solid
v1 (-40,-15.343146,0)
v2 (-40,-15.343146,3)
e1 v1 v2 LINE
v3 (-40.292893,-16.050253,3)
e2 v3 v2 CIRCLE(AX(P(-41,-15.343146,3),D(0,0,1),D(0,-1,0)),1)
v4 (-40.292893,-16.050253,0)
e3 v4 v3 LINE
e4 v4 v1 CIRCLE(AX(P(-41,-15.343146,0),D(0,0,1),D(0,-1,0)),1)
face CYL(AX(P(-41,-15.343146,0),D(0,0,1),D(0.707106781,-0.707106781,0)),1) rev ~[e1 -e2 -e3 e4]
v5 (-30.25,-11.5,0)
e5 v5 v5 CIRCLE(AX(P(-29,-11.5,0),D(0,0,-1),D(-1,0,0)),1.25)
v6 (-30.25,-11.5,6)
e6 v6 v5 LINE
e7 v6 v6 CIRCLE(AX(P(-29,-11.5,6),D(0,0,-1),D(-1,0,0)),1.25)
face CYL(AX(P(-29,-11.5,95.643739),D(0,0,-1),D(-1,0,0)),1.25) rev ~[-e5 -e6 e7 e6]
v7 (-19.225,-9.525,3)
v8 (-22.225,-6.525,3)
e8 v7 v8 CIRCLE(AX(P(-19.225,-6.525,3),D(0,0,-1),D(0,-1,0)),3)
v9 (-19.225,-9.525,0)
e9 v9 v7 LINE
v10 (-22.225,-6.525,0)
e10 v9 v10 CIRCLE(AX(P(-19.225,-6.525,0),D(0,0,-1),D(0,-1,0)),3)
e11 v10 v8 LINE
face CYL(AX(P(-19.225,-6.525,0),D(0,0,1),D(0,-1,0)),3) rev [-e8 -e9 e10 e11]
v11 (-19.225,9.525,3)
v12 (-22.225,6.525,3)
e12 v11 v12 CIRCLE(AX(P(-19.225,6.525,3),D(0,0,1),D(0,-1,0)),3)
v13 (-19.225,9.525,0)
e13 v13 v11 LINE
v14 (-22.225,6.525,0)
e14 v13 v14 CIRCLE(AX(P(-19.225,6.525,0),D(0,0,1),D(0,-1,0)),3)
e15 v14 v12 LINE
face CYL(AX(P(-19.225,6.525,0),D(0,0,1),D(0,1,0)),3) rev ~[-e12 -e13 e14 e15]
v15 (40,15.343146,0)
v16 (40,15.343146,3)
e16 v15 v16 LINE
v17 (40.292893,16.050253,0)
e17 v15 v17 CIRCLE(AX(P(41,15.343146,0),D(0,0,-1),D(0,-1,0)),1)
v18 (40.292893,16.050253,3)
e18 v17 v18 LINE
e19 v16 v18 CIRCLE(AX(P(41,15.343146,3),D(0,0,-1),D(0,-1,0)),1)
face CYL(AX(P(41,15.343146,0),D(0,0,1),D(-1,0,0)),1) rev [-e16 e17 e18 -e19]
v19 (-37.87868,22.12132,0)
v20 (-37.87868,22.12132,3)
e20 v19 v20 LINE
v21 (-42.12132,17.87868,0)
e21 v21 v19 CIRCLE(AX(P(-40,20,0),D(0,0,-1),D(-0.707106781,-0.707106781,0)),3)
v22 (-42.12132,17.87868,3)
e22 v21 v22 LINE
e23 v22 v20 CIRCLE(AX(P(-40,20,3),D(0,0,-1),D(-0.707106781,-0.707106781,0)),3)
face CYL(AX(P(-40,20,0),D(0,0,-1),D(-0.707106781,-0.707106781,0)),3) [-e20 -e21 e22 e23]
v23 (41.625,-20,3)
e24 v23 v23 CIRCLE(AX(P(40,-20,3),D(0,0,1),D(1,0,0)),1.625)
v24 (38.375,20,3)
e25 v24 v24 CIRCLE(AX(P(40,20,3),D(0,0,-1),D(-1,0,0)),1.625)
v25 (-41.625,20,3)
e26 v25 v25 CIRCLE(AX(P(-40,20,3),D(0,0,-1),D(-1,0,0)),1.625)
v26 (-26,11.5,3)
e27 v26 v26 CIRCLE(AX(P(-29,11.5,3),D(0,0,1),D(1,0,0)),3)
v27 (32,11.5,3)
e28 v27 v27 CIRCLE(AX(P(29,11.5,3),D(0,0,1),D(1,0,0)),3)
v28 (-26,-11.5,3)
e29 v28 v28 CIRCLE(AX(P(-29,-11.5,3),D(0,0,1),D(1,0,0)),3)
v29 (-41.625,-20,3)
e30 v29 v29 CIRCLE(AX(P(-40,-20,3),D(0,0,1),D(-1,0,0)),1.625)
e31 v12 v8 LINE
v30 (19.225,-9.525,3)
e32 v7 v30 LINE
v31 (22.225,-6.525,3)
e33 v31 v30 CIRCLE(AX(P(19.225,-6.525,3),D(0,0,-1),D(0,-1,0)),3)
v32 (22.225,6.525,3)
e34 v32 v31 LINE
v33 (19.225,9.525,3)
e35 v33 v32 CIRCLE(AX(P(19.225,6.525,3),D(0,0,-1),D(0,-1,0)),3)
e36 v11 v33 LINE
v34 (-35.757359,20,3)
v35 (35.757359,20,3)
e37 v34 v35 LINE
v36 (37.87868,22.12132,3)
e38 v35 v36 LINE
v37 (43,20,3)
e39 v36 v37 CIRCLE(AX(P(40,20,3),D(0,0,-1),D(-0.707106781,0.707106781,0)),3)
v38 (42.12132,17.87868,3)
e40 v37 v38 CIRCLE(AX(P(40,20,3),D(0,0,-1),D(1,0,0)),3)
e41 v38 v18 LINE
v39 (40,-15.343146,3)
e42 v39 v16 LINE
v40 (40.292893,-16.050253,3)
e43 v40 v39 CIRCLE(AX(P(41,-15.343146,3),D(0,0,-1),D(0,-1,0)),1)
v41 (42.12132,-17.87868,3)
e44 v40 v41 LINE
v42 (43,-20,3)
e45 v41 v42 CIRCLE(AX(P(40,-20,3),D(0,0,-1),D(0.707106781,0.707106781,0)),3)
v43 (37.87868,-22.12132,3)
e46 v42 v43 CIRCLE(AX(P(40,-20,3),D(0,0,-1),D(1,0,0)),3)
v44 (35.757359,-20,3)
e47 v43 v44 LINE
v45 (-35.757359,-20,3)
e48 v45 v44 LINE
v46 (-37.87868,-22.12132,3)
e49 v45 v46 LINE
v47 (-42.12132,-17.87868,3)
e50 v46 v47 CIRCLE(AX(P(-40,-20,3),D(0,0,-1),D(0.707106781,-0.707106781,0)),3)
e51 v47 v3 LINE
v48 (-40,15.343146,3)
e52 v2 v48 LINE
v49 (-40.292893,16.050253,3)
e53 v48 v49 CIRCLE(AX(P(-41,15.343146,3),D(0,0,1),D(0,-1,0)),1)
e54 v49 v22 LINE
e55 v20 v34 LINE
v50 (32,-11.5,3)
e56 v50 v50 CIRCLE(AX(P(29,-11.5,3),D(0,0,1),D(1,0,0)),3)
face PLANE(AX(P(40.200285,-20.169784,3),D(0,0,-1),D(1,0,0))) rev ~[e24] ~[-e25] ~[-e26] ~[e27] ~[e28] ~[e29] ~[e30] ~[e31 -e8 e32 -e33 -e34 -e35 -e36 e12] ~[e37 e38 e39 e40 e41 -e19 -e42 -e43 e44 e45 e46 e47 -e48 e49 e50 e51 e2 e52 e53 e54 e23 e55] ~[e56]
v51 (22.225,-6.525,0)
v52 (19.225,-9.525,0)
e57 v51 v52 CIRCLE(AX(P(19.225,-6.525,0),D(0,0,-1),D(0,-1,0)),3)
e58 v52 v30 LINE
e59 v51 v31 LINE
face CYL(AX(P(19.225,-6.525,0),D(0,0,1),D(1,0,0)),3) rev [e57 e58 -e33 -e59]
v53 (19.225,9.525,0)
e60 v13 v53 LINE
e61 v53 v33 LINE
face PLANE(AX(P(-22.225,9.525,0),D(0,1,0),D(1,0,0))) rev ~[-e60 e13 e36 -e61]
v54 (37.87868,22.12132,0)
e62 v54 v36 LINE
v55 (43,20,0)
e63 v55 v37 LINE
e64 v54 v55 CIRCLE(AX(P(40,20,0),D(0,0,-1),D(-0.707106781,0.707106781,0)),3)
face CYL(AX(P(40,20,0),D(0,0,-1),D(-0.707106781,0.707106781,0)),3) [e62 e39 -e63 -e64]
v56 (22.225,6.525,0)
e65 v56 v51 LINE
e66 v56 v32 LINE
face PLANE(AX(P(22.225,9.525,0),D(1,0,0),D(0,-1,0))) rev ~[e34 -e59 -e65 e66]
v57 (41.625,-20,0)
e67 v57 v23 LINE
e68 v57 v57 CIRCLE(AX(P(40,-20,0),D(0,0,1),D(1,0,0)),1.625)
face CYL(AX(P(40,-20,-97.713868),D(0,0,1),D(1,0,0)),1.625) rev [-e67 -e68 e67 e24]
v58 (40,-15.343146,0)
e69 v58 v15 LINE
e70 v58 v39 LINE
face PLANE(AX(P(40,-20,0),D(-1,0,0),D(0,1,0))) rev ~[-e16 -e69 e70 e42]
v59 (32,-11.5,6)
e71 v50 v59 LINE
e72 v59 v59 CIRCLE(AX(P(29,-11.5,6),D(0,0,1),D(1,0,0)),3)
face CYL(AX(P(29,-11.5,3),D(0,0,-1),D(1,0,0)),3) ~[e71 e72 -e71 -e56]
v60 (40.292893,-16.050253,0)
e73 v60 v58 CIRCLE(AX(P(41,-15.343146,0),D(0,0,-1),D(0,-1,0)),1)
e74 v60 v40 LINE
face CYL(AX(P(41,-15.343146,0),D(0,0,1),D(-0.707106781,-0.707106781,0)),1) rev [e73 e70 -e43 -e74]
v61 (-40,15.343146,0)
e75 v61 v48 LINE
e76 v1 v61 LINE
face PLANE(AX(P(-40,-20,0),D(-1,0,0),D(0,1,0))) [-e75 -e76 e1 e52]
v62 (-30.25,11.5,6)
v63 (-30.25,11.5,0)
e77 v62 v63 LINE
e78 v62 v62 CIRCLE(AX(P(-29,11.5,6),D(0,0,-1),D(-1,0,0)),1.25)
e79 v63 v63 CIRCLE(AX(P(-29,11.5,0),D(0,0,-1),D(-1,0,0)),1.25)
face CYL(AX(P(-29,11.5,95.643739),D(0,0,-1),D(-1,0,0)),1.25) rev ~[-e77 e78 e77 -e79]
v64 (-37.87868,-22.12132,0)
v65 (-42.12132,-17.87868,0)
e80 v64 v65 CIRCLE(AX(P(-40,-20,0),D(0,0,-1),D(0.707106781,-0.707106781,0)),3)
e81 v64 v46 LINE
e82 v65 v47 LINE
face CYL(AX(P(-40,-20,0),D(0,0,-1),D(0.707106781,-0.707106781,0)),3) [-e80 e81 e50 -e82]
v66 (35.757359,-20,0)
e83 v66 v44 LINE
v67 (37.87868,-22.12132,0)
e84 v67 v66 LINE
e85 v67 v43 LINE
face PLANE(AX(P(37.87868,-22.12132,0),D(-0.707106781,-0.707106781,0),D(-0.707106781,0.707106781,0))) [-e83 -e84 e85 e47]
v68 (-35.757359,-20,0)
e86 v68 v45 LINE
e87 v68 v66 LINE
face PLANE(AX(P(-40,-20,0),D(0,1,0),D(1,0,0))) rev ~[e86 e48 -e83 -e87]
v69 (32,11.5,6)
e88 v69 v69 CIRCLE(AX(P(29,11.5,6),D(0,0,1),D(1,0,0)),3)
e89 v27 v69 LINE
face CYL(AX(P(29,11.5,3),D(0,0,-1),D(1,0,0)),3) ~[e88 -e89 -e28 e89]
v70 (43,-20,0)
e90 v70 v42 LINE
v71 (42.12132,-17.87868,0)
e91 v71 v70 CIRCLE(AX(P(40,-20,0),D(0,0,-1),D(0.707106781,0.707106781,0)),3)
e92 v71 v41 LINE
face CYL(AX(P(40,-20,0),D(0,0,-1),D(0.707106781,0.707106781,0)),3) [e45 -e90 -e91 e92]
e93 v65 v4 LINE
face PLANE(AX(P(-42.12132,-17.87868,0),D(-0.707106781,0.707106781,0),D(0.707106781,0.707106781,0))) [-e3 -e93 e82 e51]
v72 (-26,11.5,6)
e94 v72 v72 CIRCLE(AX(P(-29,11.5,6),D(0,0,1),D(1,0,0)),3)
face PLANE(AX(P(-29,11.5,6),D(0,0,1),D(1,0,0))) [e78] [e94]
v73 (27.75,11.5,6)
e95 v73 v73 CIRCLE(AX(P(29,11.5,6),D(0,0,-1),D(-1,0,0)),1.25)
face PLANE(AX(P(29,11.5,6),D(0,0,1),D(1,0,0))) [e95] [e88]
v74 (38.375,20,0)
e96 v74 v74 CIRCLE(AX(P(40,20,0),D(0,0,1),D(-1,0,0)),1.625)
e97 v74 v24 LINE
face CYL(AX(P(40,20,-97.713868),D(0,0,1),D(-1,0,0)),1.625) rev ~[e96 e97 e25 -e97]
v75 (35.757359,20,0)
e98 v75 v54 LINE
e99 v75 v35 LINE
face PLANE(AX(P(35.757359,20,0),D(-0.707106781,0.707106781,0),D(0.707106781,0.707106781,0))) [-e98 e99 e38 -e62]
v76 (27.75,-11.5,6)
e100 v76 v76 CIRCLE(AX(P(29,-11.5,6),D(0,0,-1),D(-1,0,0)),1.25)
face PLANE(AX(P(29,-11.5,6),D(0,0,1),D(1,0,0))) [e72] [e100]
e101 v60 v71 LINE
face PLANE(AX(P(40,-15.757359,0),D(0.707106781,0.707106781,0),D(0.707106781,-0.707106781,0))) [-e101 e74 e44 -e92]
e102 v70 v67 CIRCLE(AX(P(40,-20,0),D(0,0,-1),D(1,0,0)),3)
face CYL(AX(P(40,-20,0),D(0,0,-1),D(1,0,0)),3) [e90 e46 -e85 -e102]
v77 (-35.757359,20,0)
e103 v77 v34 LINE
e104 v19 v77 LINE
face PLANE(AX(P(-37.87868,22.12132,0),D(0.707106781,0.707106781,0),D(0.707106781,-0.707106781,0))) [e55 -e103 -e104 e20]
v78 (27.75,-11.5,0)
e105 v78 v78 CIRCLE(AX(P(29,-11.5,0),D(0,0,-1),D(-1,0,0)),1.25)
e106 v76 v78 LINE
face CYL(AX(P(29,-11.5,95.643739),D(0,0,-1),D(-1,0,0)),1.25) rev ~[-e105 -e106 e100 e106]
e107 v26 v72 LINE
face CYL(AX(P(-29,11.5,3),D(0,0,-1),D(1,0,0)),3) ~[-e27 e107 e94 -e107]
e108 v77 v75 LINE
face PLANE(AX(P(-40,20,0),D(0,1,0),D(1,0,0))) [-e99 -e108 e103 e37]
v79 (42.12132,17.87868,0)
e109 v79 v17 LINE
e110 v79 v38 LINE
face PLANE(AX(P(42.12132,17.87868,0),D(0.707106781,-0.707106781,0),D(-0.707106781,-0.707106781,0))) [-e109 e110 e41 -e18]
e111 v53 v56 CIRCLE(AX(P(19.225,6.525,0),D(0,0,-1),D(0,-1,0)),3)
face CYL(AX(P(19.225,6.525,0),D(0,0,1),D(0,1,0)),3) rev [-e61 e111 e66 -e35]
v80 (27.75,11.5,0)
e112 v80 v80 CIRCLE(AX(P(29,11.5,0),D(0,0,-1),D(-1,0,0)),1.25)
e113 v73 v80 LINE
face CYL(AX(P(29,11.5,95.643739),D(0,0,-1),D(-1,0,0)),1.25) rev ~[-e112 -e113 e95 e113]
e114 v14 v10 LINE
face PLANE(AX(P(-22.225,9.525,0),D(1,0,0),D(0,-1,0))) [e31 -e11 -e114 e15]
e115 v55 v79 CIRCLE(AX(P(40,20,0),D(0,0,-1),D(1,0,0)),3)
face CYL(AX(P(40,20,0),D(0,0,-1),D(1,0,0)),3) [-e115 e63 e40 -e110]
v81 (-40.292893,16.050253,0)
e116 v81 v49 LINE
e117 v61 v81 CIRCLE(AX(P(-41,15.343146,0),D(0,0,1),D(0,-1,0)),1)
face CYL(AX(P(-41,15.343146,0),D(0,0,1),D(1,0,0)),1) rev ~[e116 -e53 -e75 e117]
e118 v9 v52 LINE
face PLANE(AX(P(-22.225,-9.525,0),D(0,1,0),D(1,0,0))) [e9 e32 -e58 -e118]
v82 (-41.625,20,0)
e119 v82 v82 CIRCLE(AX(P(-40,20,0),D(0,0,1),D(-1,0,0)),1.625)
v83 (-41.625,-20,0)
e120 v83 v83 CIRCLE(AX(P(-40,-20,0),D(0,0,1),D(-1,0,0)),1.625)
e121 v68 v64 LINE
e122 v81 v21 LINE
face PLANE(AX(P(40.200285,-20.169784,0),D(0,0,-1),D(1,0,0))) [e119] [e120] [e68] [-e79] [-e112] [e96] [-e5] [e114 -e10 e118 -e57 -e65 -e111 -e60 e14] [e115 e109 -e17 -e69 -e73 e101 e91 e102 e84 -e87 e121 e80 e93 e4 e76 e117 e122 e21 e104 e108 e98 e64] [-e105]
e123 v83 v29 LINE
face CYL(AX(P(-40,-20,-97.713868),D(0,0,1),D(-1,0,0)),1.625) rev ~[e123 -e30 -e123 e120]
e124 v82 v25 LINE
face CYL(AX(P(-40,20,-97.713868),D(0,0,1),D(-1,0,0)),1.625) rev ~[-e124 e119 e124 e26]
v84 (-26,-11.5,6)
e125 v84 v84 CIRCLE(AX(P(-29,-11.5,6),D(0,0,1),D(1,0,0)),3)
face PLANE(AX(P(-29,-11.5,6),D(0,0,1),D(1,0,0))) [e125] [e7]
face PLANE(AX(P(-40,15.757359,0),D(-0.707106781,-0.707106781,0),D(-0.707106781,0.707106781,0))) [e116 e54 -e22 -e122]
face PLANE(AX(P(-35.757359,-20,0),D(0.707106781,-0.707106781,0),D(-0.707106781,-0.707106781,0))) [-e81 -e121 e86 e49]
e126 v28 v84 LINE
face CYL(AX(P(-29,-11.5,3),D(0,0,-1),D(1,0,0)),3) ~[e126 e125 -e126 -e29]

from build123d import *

# Parameters (mm, degrees)
F0_W      = 80
F0_H      = 40
F1_DEPTH  = 3
F2_R      = 3
F3_DEPTH  = 3
F5_D      = 2.5
F7_DEPTH  = 3
F9_D      = 3.25
F10_W     = 44.45
F10_H     = 19.05
F11_DEPTH = 6.001
F12_R     = 3
F13_R     = 1


# Not quite as in the source:
# - a pattern or mirror of a feature is missing from the dataset's text; its kind, count and spacing are read off the source's solid
# - a feature names something its author has since deleted; it is built from what else it names


with BuildPart() as f1:
    # F0 (on Top) → F1 (new body)
    with BuildSketch(Plane.XY):
        Rectangle(F0_W, F0_H)
    extrude(amount=F1_DEPTH)

    # F2 (on face) → F3 (join)
    with BuildSketch(Plane.XY.offset(3)):
        with Locations((-29, 11.5)):
            Circle(F2_R)
        with Locations((29, 11.5)):
            Circle(F2_R)
        with Locations((29, -11.5)):
            Circle(F2_R)
        with Locations((-29, -11.5)):
            Circle(F2_R)
    extrude(amount=F3_DEPTH)

    # F5 (through all)
    with Locations(Plane.XY.offset(6)):
        with Locations((-29, 11.5), (29, 11.5), (29, -11.5), (-29, -11.5)):
            Hole(F5_D / 2)

    # F6 (on face) → F7 (join)
    with BuildSketch(Plane(origin=(0, 0, 0), x_dir=(1, 0, 0), z_dir=(0, 0, -1))):
        with BuildLine():
            ThreePointArc((42.1213203436, 17.8786796564), (42.7716385975, 18.8519497029), (43, 20))
            ThreePointArc((43, 20), (41.1480502971, 22.7716385975), (37.8786796564, 22.1213203436))
            ThreePointArc((37.8786796564, 22.1213203436), (37.2283614025, 21.1480502971), (37, 20))
            Line((37, 20), (40, 20))
            Line((40, 20), (40, 17))
            ThreePointArc((40, 17), (41.1480502971, 17.2283614025), (42.1213203436, 17.8786796564))
        make_face()
        with BuildLine():
            ThreePointArc((37, 20), (37.2283614025, 21.1480502971), (37.8786796564, 22.1213203436))
            Line((37.8786796564, 22.1213203436), (35.7573593129, 20))
            Line((35.7573593129, 20), (37, 20))
        make_face()
        with BuildLine():
            Line((40, 15.7573593129), (42.1213203436, 17.8786796564))
            ThreePointArc((42.1213203436, 17.8786796564), (41.1480502971, 17.2283614025), (40, 17))
            Line((40, 17), (40, 15.7573593129))
        make_face()
        with BuildLine():
            Line((-37, 20), (-35.7573593129, 20))
            Line((-35.7573593129, 20), (-37.8786796564, 22.1213203436))
            ThreePointArc((-37.8786796564, 22.1213203436), (-37.2283614025, 21.1480502971), (-37, 20))
        make_face()
        with BuildLine():
            Line((42.1213203436, -17.8786796564), (40, -15.7573593129))
            Line((40, -15.7573593129), (40, -17))
            ThreePointArc((40, -17), (41.1480502971, -17.2283614025), (42.1213203436, -17.8786796564))
        make_face()
        with BuildLine():
            ThreePointArc((-37, 20), (-37.2283614025, 21.1480502971), (-37.8786796564, 22.1213203436))
            ThreePointArc((-37.8786796564, 22.1213203436), (-42.1213203436, 22.1213203436), (-42.1213203436, 17.8786796564))
            ThreePointArc((-42.1213203436, 17.8786796564), (-41.1480502971, 17.2283614025), (-40, 17))
            Line((-40, 17), (-40, 20))
            Line((-40, 20), (-37, 20))
        make_face()
        with BuildLine():
            ThreePointArc((43, -20), (42.7716385975, -18.8519497029), (42.1213203436, -17.8786796564))
            ThreePointArc((42.1213203436, -17.8786796564), (41.1480502971, -17.2283614025), (40, -17))
            Line((40, -17), (40, -20))
            Line((40, -20), (37, -20))
            ThreePointArc((37, -20), (37.2283614025, -21.1480502971), (37.8786796564, -22.1213203436))
            ThreePointArc((37.8786796564, -22.1213203436), (41.1480502971, -22.7716385975), (43, -20))
        make_face()
        with BuildLine():
            ThreePointArc((-40, 17), (-41.1480502971, 17.2283614025), (-42.1213203436, 17.8786796564))
            Line((-42.1213203436, 17.8786796564), (-40, 15.7573593129))
            Line((-40, 15.7573593129), (-40, 17))
        make_face()
        with BuildLine():
            ThreePointArc((37.8786796564, -22.1213203436), (37.2283614025, -21.1480502971), (37, -20))
            Line((37, -20), (35.7573593129, -20))
            Line((35.7573593129, -20), (37.8786796564, -22.1213203436))
        make_face()
        with BuildLine():
            Line((-40, -17), (-40, -15.7573593129))
            Line((-40, -15.7573593129), (-42.1213203436, -17.8786796564))
            ThreePointArc((-42.1213203436, -17.8786796564), (-41.1480502971, -17.2283614025), (-40, -17))
        make_face()
        with BuildLine():
            Line((-37.8786796564, -22.1213203436), (-35.7573593129, -20))
            Line((-35.7573593129, -20), (-37, -20))
            ThreePointArc((-37, -20), (-37.2283614025, -21.1480502971), (-37.8786796564, -22.1213203436))
        make_face()
        with BuildLine():
            ThreePointArc((-40, -17), (-41.1480502971, -17.2283614025), (-42.1213203436, -17.8786796564))
            ThreePointArc((-42.1213203436, -17.8786796564), (-42.1213203436, -22.1213203436), (-37.8786796564, -22.1213203436))
            ThreePointArc((-37.8786796564, -22.1213203436), (-37.2283614025, -21.1480502971), (-37, -20))
            Line((-37, -20), (-40, -20))
            Line((-40, -20), (-40, -17))
        make_face()
    extrude(amount=-F7_DEPTH)

    # F9 (through all)
    with Locations(Plane(origin=(0, 0, 0), x_dir=(1, 0, 0), z_dir=(0, 0, -1))):
        with Locations((-40, 20), (-40, -20), (40, -20)):
            f9 = Hole(F9_D / 2)

    # F9_copies: F9 across plane
    add(f9.mirror(Plane(origin=(0, 0, 0), x_dir=(0, 0, 1), z_dir=(1, 0, 0))), mode=Mode.SUBTRACT)

    # F10 (on face) → F11 (cut, through all)
    with BuildSketch(Plane(origin=(0, 0, 0), x_dir=(1, 0, 0), z_dir=(0, 0, -1))):
        Rectangle(F10_W, F10_H)
    extrude(amount=-F11_DEPTH, mode=Mode.SUBTRACT)

    # F12
    f12_edges = [f1.edges().sort_by_distance(p)[0] for p in [
        (-22.225, 9.525, 1.5),
        (22.225, -9.525, 1.5),
        (-22.225, -9.525, 1.5),
        (22.225, 9.525, 1.5),
    ]]
    fillet(f12_edges, radius=F12_R)

    # F13
    f13_edges = [f1.edges().sort_by_distance(p)[0] for p in [
        (40, 15.757359, 1.5),
        (-40, 15.757359, 1.5),
        (40, -15.757359, 1.5),
        (-40, -15.757359, 1.5),
    ]]
    fillet(f13_edges, radius=F13_R)


solid = f1.part
